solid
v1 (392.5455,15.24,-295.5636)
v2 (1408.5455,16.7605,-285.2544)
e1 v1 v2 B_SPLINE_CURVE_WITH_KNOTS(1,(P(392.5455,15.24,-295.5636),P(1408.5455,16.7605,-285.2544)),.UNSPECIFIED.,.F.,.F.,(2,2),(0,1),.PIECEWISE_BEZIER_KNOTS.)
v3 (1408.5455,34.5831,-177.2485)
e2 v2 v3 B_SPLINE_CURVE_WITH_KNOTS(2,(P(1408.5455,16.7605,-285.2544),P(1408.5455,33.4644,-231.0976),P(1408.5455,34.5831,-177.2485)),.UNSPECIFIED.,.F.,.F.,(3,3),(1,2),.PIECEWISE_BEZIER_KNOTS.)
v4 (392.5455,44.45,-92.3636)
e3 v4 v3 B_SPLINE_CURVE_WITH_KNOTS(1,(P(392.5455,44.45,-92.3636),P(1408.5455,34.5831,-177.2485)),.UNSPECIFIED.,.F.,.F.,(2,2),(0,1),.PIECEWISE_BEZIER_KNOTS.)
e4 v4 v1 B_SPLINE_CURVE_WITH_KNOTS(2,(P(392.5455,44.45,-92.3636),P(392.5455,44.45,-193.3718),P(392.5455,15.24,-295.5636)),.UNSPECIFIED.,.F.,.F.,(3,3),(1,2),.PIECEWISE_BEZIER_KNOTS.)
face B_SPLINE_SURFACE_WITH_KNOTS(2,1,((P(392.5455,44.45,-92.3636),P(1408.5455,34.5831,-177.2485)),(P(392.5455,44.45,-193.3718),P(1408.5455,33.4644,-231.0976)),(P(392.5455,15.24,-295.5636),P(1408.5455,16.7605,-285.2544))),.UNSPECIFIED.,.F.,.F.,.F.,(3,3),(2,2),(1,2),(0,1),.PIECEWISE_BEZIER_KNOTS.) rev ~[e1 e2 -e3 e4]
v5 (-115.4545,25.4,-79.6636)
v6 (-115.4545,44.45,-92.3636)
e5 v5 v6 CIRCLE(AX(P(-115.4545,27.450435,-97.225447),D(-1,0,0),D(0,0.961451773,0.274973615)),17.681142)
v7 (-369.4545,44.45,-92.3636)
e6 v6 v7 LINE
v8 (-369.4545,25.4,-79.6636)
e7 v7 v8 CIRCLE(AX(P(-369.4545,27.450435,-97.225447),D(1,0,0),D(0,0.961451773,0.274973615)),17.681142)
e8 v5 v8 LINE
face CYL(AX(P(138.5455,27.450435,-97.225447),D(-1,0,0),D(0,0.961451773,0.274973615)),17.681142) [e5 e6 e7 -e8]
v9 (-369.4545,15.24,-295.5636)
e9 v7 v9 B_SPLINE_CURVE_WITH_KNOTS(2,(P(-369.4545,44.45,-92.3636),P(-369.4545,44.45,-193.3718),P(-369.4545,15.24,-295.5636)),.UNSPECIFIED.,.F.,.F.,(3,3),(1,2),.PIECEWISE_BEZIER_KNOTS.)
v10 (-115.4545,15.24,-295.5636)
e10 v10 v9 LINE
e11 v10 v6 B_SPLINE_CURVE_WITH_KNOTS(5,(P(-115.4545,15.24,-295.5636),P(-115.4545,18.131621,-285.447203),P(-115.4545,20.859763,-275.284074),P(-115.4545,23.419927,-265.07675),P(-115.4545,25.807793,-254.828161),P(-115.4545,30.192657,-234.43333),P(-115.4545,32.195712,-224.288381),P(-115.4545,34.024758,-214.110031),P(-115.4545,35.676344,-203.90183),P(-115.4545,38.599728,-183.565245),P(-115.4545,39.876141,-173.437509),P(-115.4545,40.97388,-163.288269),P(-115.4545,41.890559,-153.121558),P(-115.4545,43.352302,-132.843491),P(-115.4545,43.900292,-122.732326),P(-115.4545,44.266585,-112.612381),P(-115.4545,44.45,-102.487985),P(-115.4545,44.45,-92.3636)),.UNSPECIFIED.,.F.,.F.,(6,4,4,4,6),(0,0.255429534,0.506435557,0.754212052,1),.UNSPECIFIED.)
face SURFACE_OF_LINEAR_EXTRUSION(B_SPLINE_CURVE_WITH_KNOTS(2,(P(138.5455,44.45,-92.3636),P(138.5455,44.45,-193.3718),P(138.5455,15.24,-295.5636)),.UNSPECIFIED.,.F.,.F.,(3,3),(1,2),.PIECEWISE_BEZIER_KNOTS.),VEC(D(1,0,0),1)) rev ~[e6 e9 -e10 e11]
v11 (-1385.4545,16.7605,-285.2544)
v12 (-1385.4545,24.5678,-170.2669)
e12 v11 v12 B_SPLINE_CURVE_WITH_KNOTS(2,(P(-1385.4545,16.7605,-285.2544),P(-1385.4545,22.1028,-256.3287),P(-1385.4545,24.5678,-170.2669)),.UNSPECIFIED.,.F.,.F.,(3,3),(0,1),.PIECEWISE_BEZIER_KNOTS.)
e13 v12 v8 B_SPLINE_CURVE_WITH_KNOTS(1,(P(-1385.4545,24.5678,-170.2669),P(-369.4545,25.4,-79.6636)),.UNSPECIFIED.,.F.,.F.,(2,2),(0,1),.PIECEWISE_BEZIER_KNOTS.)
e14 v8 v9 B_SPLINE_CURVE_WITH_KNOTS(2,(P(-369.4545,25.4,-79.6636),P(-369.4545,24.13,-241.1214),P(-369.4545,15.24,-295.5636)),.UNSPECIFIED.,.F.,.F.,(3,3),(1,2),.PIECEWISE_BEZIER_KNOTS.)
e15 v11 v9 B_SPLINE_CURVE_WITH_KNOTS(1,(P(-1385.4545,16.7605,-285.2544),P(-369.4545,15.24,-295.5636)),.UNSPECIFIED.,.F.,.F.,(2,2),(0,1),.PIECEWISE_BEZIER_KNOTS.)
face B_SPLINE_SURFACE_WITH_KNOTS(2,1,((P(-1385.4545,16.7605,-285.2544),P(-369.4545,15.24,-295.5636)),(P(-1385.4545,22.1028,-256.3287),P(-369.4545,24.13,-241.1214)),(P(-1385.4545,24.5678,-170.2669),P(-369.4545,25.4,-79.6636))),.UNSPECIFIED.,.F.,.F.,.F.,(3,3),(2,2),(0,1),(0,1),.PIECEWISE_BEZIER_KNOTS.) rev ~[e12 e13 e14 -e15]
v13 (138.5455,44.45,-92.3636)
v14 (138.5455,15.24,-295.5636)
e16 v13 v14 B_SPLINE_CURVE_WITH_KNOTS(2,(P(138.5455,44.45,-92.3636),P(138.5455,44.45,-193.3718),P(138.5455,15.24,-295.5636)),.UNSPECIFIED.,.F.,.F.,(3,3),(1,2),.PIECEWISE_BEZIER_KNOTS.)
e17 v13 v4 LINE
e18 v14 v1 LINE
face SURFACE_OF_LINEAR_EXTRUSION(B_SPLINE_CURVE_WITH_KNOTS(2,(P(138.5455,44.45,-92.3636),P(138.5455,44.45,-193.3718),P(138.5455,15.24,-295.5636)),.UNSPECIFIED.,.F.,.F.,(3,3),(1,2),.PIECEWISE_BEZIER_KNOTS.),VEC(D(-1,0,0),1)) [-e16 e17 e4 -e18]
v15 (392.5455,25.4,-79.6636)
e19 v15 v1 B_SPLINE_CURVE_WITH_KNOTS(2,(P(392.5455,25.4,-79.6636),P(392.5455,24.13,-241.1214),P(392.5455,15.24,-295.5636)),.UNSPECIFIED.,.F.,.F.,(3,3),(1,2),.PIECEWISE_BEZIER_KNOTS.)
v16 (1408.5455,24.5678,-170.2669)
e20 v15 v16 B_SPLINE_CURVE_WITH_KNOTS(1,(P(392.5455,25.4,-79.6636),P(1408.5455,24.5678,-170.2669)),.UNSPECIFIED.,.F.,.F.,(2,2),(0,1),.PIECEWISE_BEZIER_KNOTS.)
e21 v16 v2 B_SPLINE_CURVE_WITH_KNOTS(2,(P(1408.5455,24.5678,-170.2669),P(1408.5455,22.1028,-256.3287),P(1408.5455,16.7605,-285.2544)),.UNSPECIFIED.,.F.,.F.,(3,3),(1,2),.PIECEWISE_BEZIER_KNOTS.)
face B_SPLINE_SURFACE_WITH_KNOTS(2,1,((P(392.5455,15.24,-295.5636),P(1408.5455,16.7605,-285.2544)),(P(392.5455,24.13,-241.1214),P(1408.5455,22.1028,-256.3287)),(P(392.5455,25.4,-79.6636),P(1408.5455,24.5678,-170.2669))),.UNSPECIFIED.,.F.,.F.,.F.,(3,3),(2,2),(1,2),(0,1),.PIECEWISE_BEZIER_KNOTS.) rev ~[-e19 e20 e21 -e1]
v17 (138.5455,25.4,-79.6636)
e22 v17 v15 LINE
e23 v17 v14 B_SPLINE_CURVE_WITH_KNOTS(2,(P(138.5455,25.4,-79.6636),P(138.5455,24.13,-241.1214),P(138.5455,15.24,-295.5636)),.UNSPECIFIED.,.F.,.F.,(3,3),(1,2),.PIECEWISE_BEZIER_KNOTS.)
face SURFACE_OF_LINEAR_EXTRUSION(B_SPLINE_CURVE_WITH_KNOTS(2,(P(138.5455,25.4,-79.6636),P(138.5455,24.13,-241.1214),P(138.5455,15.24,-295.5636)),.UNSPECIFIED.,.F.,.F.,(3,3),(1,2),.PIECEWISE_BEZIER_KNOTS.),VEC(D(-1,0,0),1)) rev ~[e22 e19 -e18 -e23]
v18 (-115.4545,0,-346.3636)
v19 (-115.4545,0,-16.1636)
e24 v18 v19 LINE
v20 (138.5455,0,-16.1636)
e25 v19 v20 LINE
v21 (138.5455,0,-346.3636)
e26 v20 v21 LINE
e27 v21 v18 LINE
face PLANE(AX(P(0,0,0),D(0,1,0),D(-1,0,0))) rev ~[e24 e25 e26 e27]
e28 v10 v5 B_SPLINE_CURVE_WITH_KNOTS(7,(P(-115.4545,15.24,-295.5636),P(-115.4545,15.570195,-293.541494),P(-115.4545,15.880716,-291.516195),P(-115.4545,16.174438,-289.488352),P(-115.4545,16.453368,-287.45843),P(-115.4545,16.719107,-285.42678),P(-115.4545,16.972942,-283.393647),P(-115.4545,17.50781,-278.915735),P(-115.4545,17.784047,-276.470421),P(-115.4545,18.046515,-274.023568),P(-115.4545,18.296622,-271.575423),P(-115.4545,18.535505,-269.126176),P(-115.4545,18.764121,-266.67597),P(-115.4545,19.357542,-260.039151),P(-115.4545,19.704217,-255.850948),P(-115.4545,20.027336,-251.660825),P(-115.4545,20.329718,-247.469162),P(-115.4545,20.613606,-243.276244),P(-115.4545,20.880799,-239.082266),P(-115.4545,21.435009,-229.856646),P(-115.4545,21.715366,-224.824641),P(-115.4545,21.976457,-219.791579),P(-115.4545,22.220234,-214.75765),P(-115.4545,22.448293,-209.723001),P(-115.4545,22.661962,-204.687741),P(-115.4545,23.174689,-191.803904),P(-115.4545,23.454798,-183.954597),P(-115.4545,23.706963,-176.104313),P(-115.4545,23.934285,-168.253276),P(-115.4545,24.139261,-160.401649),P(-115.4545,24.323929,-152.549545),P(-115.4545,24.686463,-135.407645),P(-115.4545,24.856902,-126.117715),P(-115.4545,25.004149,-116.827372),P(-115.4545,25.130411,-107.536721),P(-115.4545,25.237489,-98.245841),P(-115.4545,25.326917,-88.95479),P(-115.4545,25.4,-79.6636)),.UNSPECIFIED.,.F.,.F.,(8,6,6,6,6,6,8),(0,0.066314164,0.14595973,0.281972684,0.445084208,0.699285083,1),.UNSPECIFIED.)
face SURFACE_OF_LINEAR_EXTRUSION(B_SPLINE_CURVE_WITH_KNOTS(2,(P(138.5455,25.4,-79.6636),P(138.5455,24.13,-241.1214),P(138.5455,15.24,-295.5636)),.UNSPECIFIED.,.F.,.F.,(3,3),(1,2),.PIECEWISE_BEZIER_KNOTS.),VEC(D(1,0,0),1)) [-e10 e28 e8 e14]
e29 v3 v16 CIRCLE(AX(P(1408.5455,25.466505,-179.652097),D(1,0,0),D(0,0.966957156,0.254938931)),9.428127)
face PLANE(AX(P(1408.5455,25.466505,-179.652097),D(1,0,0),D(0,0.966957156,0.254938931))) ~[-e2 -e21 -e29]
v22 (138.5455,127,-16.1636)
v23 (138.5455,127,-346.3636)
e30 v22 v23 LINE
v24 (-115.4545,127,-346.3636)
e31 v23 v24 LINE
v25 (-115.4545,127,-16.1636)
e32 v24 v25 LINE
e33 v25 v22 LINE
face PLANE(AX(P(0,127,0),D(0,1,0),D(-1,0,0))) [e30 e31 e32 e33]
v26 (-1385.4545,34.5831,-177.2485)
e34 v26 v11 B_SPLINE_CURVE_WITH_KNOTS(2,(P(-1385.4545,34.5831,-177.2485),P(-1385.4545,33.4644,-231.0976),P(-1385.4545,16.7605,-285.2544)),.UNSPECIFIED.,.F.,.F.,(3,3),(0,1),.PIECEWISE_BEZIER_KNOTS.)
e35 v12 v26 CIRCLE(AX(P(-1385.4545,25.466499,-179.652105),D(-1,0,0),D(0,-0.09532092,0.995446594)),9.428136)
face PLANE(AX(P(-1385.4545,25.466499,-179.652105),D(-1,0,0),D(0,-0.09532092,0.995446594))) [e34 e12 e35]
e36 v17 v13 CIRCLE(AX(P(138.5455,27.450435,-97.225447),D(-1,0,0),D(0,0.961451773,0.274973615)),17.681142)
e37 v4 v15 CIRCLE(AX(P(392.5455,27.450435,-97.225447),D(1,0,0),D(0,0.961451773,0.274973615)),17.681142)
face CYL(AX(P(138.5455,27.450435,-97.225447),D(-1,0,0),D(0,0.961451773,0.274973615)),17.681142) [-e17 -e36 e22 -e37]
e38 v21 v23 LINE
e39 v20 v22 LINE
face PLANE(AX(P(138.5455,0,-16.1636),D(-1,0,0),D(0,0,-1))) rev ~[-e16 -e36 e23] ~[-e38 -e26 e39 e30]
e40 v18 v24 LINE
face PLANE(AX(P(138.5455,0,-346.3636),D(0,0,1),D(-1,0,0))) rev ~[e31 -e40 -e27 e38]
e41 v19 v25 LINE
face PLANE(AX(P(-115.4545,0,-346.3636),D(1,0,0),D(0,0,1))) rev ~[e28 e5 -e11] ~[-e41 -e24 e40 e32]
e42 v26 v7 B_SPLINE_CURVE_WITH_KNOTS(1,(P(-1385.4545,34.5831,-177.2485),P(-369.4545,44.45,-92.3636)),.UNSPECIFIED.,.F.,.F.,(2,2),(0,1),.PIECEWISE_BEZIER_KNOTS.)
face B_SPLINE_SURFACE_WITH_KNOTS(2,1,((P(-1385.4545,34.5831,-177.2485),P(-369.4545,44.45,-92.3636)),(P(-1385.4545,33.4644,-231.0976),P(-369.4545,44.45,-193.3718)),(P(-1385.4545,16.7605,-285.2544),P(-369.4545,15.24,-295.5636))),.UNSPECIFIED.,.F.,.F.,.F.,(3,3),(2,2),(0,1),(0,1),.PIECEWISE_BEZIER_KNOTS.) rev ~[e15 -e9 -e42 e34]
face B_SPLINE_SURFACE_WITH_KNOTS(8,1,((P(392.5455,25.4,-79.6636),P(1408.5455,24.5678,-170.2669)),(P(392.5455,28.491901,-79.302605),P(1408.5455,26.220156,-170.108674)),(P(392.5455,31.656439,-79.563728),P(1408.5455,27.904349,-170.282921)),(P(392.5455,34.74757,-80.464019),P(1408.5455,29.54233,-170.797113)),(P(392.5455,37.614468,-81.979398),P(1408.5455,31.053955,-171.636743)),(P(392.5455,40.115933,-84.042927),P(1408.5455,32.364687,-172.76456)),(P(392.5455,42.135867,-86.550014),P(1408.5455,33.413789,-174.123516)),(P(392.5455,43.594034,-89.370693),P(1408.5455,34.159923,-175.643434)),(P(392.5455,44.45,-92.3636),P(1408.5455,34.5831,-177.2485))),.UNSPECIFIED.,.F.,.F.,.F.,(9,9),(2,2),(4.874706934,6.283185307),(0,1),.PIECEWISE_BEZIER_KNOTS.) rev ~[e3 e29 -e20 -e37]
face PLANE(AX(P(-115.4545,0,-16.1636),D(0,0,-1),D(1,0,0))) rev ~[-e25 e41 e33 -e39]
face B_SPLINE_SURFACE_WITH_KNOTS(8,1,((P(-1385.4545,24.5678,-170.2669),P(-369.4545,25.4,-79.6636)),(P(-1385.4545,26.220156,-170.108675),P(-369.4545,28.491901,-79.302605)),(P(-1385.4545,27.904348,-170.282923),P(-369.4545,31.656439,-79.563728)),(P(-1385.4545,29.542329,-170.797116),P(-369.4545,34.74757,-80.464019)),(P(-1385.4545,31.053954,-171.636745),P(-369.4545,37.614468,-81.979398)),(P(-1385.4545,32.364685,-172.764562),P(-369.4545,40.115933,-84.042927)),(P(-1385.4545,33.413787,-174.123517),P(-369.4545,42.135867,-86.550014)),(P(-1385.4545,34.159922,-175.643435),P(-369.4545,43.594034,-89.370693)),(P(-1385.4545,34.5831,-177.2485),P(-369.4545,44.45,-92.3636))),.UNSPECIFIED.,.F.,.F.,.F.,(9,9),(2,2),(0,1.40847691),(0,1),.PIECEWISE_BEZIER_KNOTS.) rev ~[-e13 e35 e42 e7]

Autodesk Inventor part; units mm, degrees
ref_plane "YZ Plane" through (0, 0, 0) normal (1, 0, 0) x (0, 1, 0)
ref_plane "XZ Plane" through (0, 0, 0) normal (0, 1, 0) x (-1, 0, 0)
ref_plane "XY Plane" through (0, 0, 0) normal (0, 0, 1) x (1, 0, 0)
sketch "Sketch1" plane through (0, 0, 0) normal (0, 1, 0) x (-1, 0, 0)
  line L0 (115.4545, -16.1636) -> (-138.5455, -16.1636)
  line L1 (-138.5455, -16.1636) -> (-138.5455, -346.3636)
  line L2 (-138.5455, -346.3636) -> (115.4545, -346.3636)
  line L3 (115.4545, -346.3636) -> (115.4545, -16.1636)
  point P0 (0, 0)
  dimension "d0" = 254
  dimension "d1" = 330.2
extrude "Extrusion1" add sketch "Sketch1" along normal blind 127
sketch "Sketch2" plane through (138.5455, 0, -16.1636) normal (1, 0, 0) x (0, 0, -1)
  arc A0 (76.2, 44.45) -> (63.5, 25.4) centre (81.0618, 27.4505) ccw
  line L0 (76.2, 44.45) -> (177.2082, 44.45) construction
  line L1 (177.2082, 44.45) -> (279.4, 15.24) construction
  spline S0 degree 2 poles (76.2, 44.45) (177.2082, 44.45) (279.4, 15.24) knots 1 1 1 2 2 2
  line L2 (63.5, 25.4) -> (224.9578, 24.13) construction
  line L3 (224.9578, 24.13) -> (279.4, 15.24) construction
  spline S1 degree 2 poles (63.5, 25.4) (224.9578, 24.13) (279.4, 15.24) knots 1 1 1 2 2 2
  line L4 (0, 0) -> (330.2, 0) projected
  line L5 (0, 127) -> (330.2, 127) projected
  line L6 (0, 0) -> (0, 127) projected
  line L7 (330.2, 0) -> (330.2, 127) projected
  point P0 (-16.1636, 0)
  dimension "d4" = 25.4
  dimension "d5" = 15.24
  dimension "d6" = 24.13
  dimension "d7" = 82.55
  dimension "d8" = 82.55
  dimension "d9" = 63.5
  dimension "d10" = 76.2
  dimension "d11" = 50.8
  dimension "d12" = 101.0082
  dimension "d13" = 102.1918
extrude "Extrusion2" add sketch "Sketch2" along normal blind 254 and the other way blind 508 contours S0 S1 A0
ref_plane "Work Plane1" through (1408.5455, 0, -16.1636) normal (1, 0, 0) x (0, 0, -1)
sketch "Sketch5" plane through (1408.5455, 0, -16.1636) normal (1, 0, 0) x (0, 0, -1)
  arc A0 (76.2, 44.45) -> (63.5, 25.4) centre (81.0618, 27.4505) ccw projected
  spline S0 degree 2 poles (154.1033, 24.5678) (240.1651, 22.1028) (269.0908, 16.7605) knots 1 1 1 2 2 2
  spline S1 degree 2 poles (269.0908, 16.7605) (214.934, 33.4644) (161.0849, 34.5831) knots 1 1 1 2 2 2
  arc A1 (161.0849, 34.5831) -> (154.1033, 24.5678) centre (163.4885, 25.4665) ccw
  point P0 (-16.1636, 0)
loft "Loft1" add profiles "Sketch5" section 1 edges at (392.5455, 22.225, -214.3675) (392.5455, 37.1475, -193.6678) (392.5455, 37.2582, -82.5139)
ref_plane "Work Plane3" through (-1385.4545, 0, -16.1636) normal (-1, 0, 0) x (0, 0, 1)
sketch "Sketch7" plane through (-1385.4545, 0, -16.1636) normal (-1, 0, 0) x (0, 0, 1)
  spline S0 degree 2 poles (-269.0908, 16.7605) (-240.1651, 22.1028) (-154.1033, 24.5678) knots 0 0 0 1 1 1 projected
  spline S1 degree 2 poles (-161.0849, 34.5831) (-214.934, 33.4644) (-269.0908, 16.7605) knots 0 0 0 1 1 1 projected
  arc A0 (-154.1033, 24.5678) -> (-161.0849, 34.5831) centre (-163.4885, 25.4665) ccw projected
  point P0 (16.1636, 0)
loft "Loft2" add profiles "Sketch7" section 2 edges at (-369.4545, 22.225, -214.3675) (-369.4545, 37.2582, -82.5139) (-369.4545, 37.1475, -193.6678)
properties part number "Glider Box"
